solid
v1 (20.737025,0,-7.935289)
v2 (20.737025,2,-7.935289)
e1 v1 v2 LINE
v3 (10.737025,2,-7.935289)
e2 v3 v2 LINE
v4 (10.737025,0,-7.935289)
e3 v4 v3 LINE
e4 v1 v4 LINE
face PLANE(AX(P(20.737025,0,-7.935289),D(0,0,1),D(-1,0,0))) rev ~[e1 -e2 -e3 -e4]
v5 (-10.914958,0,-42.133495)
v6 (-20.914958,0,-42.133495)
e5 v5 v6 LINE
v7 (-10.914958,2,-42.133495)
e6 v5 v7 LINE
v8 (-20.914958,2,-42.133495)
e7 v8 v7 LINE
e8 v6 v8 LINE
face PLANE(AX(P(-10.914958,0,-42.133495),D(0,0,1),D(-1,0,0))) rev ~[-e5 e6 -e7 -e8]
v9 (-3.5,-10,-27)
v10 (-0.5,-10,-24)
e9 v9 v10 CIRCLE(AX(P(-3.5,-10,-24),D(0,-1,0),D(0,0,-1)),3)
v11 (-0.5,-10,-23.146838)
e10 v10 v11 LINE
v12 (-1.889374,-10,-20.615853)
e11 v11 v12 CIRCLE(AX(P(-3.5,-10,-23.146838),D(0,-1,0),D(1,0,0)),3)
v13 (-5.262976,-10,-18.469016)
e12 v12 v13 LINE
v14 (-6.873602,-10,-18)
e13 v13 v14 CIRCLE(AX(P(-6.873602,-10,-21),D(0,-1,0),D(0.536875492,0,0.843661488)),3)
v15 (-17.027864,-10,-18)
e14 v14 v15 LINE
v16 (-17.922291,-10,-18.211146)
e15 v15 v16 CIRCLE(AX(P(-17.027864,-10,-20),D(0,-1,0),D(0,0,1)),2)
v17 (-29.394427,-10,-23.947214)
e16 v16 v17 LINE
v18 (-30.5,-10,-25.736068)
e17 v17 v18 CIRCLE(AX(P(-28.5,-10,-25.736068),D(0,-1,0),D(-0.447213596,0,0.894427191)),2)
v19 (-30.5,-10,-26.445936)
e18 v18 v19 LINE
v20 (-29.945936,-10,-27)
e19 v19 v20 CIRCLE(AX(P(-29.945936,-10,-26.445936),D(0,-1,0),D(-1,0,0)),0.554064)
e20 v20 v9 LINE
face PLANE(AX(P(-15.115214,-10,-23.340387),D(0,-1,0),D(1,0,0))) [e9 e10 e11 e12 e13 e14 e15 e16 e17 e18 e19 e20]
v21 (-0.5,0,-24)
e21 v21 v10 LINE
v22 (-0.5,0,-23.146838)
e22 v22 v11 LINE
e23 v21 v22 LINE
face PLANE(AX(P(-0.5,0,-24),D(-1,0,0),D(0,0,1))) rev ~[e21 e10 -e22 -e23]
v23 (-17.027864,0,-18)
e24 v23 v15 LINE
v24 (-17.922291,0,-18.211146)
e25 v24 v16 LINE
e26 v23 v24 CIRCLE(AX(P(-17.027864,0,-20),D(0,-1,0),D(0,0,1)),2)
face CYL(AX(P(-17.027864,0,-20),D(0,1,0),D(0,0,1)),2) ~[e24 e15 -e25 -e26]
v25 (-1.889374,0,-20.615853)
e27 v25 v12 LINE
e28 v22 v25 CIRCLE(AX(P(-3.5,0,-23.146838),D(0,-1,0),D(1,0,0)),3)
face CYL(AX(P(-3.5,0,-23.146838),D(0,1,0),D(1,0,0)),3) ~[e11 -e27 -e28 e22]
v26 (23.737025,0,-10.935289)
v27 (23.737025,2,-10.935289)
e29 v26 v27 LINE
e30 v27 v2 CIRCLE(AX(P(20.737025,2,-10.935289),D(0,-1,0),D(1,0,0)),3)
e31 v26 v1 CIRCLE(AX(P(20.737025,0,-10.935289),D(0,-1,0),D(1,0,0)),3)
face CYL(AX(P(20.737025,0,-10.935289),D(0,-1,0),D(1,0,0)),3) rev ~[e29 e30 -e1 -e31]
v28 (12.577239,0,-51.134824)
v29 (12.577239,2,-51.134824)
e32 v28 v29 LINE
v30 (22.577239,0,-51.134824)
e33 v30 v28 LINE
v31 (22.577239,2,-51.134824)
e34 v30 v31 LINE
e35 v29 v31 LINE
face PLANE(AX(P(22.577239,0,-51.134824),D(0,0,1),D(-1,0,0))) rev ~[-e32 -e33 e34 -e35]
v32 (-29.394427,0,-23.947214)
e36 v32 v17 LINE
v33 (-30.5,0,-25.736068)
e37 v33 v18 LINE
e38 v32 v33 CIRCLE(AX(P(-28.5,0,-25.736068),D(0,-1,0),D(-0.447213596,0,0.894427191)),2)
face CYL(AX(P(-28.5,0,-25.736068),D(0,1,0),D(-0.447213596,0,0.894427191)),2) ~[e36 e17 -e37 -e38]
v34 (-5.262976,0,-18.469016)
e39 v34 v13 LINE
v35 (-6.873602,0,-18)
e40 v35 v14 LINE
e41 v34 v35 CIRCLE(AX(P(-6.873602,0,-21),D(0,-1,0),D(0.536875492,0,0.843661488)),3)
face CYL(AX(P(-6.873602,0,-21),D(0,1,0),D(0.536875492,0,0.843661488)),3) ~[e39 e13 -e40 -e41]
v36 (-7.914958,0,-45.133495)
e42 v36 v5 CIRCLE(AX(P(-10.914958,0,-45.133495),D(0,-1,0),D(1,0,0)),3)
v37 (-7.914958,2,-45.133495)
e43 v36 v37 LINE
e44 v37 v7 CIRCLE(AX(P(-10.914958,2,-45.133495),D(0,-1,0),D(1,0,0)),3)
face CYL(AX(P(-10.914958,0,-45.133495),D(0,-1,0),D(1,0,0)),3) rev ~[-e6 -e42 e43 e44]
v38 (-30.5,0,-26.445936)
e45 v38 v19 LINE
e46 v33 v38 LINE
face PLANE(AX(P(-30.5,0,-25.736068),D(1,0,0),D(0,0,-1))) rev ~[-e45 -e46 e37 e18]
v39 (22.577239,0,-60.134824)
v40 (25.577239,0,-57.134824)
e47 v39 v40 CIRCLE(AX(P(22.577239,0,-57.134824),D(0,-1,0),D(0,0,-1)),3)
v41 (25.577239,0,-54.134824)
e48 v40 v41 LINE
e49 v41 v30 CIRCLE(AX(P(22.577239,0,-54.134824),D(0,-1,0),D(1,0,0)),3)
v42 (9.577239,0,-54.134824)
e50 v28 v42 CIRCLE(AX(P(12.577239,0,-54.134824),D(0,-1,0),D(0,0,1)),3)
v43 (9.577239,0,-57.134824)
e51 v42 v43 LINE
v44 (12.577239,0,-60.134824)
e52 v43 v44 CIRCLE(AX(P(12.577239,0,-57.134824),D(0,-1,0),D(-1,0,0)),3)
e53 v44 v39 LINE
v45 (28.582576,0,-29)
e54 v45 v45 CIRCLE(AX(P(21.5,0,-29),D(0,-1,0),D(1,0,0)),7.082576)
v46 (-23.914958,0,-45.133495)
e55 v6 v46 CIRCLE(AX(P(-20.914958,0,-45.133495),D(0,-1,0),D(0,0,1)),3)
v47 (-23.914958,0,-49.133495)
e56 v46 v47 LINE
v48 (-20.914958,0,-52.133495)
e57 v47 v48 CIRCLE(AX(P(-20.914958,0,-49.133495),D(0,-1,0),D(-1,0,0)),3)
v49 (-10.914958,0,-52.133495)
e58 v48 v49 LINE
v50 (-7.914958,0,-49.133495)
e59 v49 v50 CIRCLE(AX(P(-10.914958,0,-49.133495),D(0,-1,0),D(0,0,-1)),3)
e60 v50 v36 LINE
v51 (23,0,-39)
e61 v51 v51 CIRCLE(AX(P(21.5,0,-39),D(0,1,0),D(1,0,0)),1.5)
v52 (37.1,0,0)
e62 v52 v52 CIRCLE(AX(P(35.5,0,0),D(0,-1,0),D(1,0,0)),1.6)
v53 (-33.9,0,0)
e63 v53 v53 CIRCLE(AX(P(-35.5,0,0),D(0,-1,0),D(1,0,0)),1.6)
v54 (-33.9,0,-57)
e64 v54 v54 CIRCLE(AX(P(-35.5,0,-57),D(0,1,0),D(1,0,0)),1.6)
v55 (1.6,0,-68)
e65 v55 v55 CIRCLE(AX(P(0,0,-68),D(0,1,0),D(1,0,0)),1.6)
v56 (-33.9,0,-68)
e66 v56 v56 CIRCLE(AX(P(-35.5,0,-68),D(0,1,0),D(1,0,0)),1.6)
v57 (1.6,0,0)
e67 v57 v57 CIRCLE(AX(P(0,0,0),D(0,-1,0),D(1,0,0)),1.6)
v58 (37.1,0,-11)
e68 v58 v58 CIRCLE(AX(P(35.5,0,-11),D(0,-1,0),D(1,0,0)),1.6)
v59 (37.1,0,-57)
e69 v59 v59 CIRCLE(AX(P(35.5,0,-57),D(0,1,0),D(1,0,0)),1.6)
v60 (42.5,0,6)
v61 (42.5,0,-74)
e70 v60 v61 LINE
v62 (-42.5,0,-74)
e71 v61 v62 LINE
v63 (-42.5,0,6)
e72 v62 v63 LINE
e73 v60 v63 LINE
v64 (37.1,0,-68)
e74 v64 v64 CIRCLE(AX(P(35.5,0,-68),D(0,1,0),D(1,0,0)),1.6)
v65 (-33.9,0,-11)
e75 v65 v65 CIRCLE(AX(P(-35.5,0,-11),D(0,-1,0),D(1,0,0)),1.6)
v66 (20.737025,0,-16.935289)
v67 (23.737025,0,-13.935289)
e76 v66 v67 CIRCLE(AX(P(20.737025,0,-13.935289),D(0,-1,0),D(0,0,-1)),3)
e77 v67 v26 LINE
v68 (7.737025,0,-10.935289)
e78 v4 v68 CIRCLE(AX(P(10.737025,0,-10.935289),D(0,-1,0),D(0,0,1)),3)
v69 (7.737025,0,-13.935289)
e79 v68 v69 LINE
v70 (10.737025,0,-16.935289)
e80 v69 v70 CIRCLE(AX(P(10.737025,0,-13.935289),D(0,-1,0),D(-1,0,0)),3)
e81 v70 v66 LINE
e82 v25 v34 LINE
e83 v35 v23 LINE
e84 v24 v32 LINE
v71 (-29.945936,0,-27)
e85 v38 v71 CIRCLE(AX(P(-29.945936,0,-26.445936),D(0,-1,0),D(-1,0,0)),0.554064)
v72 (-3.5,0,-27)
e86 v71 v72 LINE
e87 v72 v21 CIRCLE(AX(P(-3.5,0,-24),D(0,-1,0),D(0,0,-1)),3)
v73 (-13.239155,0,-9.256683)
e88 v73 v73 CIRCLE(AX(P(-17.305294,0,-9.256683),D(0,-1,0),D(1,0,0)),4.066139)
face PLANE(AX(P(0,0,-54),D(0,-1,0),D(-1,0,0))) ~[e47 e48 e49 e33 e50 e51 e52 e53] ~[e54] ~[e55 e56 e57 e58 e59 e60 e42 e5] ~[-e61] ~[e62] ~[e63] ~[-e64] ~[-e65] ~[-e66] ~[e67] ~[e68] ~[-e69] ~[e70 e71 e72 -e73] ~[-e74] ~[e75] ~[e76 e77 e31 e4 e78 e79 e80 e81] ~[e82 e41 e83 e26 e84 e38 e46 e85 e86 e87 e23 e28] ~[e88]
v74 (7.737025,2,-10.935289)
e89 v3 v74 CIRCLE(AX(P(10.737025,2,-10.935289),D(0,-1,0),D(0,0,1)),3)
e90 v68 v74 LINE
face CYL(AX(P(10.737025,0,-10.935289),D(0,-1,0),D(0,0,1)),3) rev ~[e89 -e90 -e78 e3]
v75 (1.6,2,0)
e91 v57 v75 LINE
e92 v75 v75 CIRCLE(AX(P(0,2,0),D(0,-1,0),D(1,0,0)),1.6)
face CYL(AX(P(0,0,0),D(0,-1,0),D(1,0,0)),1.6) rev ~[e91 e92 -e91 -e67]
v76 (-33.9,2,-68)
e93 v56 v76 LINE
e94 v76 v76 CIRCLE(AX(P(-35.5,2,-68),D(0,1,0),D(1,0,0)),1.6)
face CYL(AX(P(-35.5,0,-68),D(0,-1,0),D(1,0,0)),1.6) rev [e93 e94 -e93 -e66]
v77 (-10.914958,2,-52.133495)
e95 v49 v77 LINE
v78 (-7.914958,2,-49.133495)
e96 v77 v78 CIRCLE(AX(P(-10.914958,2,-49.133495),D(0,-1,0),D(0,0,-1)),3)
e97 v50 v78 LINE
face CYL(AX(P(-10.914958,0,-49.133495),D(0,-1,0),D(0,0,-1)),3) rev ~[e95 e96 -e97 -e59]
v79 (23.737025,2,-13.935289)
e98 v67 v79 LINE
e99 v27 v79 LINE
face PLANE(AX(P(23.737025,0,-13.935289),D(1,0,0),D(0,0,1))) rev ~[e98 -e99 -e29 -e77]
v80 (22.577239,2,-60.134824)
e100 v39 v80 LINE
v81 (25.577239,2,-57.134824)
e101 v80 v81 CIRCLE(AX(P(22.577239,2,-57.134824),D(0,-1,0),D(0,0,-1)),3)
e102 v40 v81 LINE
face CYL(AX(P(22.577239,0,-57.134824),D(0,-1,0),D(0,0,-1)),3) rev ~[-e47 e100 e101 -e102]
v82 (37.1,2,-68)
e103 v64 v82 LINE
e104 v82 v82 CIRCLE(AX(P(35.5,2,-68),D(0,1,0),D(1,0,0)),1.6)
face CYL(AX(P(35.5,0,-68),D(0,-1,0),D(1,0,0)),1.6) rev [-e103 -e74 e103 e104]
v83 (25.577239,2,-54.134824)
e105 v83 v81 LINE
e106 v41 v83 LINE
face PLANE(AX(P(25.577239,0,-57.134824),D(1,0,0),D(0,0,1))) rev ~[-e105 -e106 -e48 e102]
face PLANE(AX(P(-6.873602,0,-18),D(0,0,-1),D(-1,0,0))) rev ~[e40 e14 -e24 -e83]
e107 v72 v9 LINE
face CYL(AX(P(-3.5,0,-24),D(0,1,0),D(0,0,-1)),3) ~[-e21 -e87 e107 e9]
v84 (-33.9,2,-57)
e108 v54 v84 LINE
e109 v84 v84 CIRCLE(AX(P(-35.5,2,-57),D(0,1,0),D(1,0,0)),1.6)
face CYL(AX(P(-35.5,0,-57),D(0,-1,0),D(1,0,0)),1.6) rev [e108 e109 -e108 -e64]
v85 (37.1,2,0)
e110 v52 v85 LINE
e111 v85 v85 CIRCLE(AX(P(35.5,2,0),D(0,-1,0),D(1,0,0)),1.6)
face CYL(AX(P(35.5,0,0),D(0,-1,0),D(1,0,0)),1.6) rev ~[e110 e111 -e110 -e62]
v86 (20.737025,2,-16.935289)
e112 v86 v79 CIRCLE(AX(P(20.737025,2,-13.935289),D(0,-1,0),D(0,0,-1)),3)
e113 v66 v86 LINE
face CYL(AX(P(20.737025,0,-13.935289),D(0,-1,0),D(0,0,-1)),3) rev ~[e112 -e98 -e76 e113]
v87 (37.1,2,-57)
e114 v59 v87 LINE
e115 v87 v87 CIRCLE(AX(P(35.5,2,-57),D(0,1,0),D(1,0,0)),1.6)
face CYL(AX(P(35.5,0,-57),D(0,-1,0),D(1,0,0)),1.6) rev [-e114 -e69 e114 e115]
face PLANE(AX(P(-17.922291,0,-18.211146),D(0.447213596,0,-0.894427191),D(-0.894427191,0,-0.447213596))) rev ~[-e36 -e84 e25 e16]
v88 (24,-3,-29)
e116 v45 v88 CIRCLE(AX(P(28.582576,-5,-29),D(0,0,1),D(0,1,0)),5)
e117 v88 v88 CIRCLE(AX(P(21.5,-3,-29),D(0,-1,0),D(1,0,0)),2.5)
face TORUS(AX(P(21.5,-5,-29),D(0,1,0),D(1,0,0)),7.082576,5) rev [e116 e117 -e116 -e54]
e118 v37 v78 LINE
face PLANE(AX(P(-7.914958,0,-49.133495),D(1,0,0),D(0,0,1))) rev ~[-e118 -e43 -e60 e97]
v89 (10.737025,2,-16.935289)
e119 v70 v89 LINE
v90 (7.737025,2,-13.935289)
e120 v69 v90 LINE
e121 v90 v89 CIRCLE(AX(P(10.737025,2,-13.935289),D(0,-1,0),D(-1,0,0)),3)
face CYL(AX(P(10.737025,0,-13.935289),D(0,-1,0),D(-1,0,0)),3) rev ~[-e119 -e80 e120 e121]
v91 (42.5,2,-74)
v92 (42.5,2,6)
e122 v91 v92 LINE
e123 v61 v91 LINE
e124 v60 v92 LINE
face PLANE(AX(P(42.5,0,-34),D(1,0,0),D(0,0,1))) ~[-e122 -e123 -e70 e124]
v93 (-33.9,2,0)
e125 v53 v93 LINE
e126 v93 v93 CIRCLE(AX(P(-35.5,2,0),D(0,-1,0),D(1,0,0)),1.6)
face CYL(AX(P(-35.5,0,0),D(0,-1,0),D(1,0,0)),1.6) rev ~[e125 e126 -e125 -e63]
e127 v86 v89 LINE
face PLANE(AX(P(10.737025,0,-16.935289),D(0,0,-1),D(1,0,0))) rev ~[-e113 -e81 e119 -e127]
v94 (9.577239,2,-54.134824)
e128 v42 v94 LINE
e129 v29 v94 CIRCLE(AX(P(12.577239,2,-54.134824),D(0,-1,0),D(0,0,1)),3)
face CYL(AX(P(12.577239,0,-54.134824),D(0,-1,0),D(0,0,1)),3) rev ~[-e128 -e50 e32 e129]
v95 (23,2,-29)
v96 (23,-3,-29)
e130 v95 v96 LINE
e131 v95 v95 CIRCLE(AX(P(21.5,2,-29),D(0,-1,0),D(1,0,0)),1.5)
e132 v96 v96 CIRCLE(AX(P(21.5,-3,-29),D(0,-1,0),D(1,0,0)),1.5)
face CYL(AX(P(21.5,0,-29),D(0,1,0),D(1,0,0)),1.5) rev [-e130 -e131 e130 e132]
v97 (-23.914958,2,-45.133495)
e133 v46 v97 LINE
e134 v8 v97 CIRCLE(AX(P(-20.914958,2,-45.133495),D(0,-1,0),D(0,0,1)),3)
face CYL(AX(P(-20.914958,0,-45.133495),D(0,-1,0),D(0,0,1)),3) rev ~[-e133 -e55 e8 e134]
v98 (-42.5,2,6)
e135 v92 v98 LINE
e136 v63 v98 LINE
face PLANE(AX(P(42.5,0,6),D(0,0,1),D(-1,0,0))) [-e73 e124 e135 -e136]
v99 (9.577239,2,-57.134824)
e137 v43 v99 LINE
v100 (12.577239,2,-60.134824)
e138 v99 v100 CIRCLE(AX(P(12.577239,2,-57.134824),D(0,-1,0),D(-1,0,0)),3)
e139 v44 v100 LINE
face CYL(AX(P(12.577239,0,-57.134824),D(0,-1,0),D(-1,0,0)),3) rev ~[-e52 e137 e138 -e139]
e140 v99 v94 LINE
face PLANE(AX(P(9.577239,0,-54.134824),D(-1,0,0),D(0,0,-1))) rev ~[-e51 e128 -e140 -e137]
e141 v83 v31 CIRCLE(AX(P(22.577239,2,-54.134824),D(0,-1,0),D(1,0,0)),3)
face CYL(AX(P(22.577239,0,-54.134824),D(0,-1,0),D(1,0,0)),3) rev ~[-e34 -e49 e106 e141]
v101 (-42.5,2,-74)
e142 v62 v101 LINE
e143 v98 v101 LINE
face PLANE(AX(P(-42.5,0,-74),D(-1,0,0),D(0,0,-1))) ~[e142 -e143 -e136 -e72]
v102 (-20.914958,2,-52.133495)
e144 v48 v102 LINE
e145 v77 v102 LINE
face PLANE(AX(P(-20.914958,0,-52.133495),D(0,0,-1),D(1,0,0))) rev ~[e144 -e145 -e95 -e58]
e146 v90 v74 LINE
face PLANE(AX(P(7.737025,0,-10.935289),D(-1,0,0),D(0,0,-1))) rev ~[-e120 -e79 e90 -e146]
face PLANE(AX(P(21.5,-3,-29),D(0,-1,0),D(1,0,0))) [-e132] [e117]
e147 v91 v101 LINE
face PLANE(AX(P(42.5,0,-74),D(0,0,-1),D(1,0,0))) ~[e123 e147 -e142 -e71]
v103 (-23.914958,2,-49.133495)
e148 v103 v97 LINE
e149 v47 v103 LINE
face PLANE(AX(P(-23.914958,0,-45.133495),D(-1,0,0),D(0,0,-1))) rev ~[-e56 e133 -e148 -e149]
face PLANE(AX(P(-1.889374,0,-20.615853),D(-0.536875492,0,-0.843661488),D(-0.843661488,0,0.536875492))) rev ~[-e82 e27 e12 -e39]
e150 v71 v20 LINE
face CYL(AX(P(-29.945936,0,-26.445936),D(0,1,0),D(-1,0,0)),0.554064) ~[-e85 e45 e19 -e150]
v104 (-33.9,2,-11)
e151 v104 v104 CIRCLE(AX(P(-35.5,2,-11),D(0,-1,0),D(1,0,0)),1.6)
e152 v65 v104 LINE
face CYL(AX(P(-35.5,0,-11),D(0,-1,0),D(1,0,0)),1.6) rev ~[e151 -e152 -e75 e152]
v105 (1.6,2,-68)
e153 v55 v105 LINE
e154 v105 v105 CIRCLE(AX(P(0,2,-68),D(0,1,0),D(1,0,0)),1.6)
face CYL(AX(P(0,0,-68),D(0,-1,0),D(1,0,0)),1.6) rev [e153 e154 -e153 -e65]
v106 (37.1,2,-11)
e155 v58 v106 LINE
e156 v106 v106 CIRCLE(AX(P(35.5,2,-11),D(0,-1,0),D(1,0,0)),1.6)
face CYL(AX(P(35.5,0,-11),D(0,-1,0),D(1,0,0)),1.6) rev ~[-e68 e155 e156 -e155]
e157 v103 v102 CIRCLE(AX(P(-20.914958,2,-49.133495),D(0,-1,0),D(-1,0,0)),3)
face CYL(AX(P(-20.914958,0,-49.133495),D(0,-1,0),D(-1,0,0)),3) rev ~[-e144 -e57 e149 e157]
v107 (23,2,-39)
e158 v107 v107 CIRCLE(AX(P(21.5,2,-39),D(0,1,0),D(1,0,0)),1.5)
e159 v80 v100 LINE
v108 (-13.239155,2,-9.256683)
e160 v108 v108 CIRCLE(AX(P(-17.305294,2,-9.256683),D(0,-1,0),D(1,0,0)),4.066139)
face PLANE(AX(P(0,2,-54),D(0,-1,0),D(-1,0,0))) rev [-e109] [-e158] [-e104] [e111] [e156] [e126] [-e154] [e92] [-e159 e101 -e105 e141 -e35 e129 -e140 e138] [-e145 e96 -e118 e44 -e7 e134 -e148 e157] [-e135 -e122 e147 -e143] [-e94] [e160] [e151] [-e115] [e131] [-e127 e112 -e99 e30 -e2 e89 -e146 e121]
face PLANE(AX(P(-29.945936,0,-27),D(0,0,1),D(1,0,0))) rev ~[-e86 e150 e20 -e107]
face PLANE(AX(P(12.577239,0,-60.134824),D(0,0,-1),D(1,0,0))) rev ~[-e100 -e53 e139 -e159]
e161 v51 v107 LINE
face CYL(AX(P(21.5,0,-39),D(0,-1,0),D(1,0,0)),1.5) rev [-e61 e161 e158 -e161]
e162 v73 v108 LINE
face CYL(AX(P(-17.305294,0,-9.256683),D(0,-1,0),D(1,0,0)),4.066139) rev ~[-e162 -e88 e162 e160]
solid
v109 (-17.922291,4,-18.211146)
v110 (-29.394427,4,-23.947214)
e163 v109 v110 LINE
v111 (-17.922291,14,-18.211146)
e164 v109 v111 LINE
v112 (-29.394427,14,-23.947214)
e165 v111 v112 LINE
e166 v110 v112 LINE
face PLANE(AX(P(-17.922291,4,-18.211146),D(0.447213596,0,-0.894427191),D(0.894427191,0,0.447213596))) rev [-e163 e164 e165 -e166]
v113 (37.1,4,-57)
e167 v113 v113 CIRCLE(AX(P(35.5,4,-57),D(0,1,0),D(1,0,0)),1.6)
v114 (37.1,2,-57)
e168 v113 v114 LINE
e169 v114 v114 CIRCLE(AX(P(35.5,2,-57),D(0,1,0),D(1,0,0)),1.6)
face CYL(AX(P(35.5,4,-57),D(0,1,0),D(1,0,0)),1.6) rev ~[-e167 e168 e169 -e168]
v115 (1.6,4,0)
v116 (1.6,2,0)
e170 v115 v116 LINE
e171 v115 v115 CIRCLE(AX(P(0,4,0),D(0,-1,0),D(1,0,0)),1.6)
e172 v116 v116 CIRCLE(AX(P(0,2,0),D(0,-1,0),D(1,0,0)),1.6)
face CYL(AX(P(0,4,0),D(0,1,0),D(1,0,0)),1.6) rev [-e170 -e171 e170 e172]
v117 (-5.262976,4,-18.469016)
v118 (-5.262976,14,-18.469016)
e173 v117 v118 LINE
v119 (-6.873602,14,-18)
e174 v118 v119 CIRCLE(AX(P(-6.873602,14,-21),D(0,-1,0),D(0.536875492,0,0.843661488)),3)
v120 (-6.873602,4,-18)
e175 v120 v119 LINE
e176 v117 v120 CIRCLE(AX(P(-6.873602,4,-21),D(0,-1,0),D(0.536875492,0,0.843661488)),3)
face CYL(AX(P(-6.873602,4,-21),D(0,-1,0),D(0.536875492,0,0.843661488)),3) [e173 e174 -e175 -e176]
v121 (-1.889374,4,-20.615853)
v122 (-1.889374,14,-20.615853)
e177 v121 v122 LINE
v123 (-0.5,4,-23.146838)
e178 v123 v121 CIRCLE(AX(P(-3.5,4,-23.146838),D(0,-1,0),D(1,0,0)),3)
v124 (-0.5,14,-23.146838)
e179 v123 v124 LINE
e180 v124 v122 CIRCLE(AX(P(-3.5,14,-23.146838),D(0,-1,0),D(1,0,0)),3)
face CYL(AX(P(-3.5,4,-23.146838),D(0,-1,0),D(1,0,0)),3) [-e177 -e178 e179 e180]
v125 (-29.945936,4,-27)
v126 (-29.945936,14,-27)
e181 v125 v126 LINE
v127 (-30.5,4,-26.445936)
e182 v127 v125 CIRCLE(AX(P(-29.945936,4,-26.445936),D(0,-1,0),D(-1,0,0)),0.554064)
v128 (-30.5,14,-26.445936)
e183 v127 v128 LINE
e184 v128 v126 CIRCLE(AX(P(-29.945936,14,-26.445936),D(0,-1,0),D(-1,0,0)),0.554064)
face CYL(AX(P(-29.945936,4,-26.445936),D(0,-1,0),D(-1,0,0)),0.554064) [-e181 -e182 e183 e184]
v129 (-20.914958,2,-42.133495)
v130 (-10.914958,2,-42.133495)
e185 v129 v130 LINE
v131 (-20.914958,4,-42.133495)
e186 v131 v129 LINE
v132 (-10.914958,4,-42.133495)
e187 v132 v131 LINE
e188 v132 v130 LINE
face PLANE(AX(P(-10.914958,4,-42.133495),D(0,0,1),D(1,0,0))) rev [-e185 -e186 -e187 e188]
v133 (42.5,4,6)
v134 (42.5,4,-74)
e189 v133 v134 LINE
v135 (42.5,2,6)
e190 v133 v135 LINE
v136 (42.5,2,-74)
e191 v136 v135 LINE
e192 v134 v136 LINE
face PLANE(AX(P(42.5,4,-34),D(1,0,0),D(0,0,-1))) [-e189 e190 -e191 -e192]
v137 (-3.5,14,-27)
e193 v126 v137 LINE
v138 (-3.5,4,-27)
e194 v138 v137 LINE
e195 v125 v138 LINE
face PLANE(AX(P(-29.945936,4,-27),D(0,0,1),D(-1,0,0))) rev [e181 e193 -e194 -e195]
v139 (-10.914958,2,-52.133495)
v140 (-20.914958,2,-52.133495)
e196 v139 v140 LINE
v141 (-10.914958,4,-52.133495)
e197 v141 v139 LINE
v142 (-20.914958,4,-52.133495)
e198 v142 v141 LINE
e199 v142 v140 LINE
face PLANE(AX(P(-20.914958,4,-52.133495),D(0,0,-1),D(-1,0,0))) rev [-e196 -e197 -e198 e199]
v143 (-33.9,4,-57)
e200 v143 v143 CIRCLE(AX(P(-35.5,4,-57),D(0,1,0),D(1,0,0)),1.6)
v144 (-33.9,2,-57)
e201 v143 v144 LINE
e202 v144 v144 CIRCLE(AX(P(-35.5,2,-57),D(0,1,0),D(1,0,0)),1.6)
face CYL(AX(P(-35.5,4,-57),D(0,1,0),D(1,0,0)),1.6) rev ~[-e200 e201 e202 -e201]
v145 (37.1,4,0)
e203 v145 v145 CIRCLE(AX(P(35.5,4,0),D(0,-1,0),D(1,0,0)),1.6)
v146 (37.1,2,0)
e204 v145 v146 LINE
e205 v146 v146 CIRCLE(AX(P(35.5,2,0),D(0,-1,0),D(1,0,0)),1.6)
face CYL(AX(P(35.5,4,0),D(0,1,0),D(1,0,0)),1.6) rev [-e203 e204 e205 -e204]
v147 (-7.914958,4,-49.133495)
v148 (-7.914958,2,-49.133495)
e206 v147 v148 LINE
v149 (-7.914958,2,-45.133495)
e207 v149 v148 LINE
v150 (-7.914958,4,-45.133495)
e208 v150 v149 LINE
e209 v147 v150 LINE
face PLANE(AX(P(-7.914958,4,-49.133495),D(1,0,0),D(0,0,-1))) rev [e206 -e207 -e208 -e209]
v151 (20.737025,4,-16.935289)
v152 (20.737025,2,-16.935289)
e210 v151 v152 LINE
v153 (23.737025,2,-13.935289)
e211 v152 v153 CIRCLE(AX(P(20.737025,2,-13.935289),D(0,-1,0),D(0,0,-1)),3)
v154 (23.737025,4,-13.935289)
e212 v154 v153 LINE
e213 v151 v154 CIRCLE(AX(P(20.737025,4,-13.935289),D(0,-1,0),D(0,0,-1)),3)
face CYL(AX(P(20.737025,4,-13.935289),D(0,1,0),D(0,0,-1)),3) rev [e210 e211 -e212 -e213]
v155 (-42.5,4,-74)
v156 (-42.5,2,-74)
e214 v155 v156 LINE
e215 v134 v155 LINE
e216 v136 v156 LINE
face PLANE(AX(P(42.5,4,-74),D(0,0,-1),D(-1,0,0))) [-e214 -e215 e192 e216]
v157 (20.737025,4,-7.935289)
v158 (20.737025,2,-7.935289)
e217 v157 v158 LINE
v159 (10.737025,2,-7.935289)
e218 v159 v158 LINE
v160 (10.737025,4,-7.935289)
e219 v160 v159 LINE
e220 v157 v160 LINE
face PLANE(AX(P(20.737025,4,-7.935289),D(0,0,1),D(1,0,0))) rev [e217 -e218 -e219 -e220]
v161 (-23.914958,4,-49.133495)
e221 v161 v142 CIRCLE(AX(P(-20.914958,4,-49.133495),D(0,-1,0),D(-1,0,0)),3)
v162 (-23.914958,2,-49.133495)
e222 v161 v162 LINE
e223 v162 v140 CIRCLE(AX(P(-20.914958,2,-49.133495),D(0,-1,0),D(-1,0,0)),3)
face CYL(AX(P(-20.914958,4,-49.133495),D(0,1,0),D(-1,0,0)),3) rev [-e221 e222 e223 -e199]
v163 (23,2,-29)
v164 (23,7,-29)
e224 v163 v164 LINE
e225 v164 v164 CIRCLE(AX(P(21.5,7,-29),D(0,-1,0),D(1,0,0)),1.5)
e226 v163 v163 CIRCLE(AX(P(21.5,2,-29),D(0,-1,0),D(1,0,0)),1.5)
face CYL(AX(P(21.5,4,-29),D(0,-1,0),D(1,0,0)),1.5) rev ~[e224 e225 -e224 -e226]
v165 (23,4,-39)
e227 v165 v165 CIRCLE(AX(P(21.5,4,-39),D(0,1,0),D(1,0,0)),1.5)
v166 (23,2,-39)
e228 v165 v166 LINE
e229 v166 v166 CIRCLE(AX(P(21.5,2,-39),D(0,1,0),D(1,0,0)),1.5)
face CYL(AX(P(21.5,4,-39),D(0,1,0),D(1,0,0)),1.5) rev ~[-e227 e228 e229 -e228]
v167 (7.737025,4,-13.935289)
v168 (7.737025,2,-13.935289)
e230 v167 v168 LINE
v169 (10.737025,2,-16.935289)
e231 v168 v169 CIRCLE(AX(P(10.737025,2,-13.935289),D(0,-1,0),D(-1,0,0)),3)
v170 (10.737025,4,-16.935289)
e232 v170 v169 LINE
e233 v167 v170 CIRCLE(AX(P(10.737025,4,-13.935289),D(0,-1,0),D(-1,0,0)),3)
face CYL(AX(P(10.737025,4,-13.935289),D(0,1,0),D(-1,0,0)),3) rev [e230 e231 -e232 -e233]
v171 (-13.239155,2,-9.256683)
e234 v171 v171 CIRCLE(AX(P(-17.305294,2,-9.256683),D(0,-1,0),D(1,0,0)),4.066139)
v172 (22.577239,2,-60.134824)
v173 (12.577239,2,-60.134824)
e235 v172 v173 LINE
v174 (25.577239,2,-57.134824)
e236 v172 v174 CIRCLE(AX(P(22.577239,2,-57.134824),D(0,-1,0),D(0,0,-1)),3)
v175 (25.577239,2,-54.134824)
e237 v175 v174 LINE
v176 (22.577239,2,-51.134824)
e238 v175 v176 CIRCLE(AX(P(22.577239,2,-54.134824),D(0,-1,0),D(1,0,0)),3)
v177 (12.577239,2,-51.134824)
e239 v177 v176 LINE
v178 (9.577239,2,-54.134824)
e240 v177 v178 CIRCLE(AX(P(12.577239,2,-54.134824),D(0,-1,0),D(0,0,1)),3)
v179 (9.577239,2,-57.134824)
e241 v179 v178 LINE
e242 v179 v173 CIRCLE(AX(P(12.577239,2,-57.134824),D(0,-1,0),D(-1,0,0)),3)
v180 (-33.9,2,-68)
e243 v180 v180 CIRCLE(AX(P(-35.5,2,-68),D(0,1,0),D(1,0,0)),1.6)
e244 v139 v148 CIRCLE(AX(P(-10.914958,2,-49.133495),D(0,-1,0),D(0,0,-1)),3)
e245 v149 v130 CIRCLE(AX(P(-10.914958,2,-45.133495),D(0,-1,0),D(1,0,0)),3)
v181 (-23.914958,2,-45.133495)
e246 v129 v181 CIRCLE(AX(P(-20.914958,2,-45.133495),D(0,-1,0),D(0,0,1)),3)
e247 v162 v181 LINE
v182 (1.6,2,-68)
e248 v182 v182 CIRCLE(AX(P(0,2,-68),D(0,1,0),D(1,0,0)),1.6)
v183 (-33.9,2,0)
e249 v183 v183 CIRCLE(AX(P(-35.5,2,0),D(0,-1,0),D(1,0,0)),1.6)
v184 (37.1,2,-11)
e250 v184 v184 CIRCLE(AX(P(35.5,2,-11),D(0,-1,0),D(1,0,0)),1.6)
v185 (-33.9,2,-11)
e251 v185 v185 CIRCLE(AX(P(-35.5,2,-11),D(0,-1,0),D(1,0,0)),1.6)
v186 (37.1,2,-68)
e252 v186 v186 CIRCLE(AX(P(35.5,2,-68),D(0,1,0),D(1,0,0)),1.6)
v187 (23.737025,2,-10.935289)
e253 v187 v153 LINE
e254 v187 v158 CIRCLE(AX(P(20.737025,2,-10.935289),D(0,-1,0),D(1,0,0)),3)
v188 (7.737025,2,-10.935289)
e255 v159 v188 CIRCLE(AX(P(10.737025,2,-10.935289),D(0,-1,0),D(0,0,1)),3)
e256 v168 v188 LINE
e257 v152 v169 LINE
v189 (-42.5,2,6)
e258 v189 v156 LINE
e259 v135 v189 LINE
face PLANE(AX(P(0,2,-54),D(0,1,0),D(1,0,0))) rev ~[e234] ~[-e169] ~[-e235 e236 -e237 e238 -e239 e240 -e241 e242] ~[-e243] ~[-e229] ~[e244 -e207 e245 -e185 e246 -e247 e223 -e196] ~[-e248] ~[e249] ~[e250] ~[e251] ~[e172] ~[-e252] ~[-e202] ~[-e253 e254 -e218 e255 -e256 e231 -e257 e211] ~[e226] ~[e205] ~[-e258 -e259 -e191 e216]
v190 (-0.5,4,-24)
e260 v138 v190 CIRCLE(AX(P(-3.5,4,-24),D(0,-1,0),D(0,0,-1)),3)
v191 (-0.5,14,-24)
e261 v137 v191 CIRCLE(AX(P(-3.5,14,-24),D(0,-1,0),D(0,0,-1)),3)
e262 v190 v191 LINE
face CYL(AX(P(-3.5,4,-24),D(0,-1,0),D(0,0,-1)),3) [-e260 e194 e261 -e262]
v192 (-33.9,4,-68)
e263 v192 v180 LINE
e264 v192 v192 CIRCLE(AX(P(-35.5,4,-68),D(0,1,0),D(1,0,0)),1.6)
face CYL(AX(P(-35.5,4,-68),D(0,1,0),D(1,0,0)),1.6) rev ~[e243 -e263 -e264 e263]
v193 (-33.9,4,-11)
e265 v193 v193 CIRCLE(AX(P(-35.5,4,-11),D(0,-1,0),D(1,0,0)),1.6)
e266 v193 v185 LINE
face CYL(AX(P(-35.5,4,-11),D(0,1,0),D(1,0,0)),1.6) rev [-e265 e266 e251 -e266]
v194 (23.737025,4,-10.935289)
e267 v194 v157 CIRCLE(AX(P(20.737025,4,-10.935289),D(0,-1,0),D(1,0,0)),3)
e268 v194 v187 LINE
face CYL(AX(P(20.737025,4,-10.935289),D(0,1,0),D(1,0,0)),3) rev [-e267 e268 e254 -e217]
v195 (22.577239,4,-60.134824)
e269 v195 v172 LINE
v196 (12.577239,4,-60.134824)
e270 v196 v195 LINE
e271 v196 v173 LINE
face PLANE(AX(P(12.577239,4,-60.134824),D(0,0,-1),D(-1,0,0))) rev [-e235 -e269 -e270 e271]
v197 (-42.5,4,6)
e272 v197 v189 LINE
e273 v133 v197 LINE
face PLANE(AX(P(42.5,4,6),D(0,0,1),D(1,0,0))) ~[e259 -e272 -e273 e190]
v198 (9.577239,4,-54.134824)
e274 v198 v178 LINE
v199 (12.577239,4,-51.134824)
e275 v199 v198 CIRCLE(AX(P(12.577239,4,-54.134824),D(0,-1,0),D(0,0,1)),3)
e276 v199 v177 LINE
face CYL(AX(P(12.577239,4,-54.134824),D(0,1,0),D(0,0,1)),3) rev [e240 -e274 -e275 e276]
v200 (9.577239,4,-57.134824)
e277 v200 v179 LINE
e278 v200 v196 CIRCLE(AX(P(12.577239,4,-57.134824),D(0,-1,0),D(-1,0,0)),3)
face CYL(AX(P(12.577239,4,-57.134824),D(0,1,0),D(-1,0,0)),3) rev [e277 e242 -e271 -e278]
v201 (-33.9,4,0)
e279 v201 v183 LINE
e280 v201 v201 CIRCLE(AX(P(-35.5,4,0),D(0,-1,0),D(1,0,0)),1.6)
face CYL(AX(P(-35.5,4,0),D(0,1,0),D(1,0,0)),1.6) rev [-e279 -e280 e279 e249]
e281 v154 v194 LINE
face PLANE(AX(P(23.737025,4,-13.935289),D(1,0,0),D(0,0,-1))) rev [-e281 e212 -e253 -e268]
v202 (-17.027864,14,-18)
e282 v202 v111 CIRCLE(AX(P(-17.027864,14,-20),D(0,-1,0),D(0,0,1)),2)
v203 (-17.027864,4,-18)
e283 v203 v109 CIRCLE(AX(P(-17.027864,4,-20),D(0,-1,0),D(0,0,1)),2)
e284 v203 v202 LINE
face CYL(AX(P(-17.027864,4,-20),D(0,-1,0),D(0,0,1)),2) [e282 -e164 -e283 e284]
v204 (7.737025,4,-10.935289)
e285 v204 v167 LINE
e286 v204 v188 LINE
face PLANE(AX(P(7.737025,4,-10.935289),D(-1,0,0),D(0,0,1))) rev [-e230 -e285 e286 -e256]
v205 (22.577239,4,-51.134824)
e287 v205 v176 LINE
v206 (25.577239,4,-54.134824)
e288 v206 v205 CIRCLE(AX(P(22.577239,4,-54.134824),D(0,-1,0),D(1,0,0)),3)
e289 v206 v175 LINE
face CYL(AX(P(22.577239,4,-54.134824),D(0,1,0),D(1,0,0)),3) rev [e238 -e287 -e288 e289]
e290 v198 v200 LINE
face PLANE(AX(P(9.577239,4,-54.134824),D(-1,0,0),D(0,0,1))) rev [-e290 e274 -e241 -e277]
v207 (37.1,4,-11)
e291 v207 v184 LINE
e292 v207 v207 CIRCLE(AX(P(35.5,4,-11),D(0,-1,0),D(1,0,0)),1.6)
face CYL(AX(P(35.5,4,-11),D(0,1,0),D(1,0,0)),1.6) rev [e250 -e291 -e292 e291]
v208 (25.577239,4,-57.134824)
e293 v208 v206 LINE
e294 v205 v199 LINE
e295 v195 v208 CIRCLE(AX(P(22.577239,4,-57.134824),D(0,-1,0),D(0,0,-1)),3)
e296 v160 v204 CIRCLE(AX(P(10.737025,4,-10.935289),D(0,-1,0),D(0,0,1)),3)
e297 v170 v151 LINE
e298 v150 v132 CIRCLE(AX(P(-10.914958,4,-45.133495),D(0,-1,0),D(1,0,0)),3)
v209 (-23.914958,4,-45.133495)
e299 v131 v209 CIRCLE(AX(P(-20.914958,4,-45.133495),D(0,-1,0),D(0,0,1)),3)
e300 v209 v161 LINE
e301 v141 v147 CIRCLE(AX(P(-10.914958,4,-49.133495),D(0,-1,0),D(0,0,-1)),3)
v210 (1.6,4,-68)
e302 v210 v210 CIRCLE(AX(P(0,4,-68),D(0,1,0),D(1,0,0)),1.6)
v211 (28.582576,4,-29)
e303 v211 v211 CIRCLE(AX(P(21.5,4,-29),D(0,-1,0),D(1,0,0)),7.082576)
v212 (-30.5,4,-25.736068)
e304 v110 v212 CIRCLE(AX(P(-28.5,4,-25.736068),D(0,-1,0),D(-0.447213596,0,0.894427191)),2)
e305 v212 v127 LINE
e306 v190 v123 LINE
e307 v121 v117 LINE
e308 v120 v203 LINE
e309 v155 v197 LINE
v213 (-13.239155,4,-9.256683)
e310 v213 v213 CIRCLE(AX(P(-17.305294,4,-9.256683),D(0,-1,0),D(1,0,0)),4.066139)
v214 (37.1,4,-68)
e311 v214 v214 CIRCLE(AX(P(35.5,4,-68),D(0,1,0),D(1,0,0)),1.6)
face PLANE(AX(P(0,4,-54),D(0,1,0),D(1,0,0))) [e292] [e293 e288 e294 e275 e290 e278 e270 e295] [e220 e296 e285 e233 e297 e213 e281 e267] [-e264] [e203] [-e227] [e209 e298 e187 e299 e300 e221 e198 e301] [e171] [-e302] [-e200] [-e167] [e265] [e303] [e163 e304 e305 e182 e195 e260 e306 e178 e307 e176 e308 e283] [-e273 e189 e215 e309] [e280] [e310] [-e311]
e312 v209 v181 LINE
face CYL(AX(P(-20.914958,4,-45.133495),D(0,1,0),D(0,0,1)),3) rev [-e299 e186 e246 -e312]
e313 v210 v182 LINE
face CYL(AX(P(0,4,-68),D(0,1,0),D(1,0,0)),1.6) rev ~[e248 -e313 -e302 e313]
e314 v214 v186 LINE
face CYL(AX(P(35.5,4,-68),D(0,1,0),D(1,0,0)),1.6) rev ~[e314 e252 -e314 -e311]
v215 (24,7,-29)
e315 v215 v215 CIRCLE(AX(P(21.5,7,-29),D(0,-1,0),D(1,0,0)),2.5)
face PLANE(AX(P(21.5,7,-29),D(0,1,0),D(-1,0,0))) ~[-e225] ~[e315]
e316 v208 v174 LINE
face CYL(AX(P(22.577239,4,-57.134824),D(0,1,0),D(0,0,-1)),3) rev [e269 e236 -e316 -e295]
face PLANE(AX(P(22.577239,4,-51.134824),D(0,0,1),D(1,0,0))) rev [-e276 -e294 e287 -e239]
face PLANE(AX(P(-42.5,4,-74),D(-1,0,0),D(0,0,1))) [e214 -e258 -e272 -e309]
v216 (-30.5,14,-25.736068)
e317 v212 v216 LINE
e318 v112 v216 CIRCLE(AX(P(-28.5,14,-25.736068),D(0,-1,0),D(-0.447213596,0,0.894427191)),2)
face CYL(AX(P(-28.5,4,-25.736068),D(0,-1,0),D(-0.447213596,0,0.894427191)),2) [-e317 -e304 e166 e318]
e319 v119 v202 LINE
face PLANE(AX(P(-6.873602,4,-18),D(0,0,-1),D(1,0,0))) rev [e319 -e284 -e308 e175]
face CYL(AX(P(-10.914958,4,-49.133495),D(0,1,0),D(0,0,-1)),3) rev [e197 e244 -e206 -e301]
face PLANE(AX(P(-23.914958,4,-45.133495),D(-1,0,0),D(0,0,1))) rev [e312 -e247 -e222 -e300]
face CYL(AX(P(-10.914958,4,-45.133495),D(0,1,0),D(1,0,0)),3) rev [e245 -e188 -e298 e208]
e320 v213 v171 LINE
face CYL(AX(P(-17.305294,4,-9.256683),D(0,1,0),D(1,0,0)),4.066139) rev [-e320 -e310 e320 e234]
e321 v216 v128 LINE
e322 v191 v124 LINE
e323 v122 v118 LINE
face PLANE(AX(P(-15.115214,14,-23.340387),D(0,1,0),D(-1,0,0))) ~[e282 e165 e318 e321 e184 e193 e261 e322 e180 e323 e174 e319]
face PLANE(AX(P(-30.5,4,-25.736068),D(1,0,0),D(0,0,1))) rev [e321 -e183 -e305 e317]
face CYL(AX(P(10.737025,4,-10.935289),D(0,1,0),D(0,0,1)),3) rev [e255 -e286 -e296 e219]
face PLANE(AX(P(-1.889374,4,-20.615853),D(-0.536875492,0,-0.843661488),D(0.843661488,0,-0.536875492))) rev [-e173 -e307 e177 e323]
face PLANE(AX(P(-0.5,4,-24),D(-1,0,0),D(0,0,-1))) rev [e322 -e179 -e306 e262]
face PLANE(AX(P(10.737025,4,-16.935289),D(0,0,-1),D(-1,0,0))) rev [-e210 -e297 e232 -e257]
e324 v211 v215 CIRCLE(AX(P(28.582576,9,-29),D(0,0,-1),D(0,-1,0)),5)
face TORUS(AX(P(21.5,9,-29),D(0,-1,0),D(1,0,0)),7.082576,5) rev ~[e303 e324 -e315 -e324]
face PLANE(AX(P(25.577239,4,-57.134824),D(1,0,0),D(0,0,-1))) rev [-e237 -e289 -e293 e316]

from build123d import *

# Parameters (mm, degrees)
F0_R          = 2.5
F0_R_2        = 1.6
F0_R_3        = 1.5
F1_DEPTH      = 2
F3_DEPTH      = 10
F4_DEPTH      = 3
F4_DEPTH_BACK = 2
F6_R          = 4.0661391715
F7_DEPTH      = 25


# Not quite as in the source:
# - a fillet or chamfer that OpenCascade refuses, or shapes differently, is made with other operations: its cross-section is extruded or revolved along the edge and cut away or added


with BuildPart() as f1:
    # F0 (on Front) → F1 (new body)
    with BuildSketch(Plane.XZ):
        Polygon((42.5, -4), (42.5, 4), (42.5, 6), (-42.5, 6), (-42.5, 4), (-42.5, -4), (-42.5, -34), (42.5, -34), align=None)
        with BuildLine():
            Line((-3.5, -27), (-29.945935972, -27))
            ThreePointArc((-29.945935972, -27), (-30.3377184034, -26.8377184034), (-30.5, -26.445935972))
            Line((-30.5, -26.445935972), (-30.5, -25.7360679775))
            ThreePointArc((-30.5, -25.7360679775), (-30.2013016167, -24.6846057533), (-29.394427191, -23.9472135955))
            Line((-29.394427191, -23.9472135955), (-17.922291236, -18.211145618))
            ThreePointArc((-17.922291236, -18.211145618), (-17.4873698861, -18.0535020211), (-17.027864045, -18))
            Line((-17.027864045, -18), (-6.8736020616, -18))
            ThreePointArc((-6.8736020616, -18), (-6.0348391003, -18.1196394853), (-5.262975585, -18.4690155368))
            Line((-5.262975585, -18.4690155368), (-1.8893735234, -20.6158532124))
            ThreePointArc((-1.8893735234, -20.6158532124), (-0.87018257, -21.7032102011), (-0.5, -23.1468376756))
            Line((-0.5, -23.1468376756), (-0.5, -24))
            ThreePointArc((-0.5, -24), (-1.3786796564, -26.1213203436), (-3.5, -27))
        make_face(mode=Mode.SUBTRACT)
        with Locations((21.5, -29)):
            Circle(F0_R, mode=Mode.SUBTRACT)
        with Locations((-35.5, -11)):
            Circle(F0_R_2, mode=Mode.SUBTRACT)
        with Locations((-35.5, 0)):
            Circle(F0_R_2, mode=Mode.SUBTRACT)
        with Locations((35.5, -11)):
            Circle(F0_R_2, mode=Mode.SUBTRACT)
        Circle(F0_R_2, mode=Mode.SUBTRACT)
        with Locations((35.5, 0)):
            Circle(F0_R_2, mode=Mode.SUBTRACT)
        with BuildLine():
            ThreePointArc((-30.5, -26.445935972), (-30.3377184034, -26.8377184034), (-29.945935972, -27))
            Line((-29.945935972, -27), (-3.5, -27))
            ThreePointArc((-3.5, -27), (-1.3786796564, -26.1213203436), (-0.5, -24))
            Line((-0.5, -24), (-0.5, -23.1468376756))
            ThreePointArc((-0.5, -23.1468376756), (-0.87018257, -21.7032102011), (-1.8893735234, -20.6158532124))
            Line((-1.8893735234, -20.6158532124), (-5.262975585, -18.4690155368))
            ThreePointArc((-5.262975585, -18.4690155368), (-6.0348391003, -18.1196394853), (-6.8736020616, -18))
            Line((-6.8736020616, -18), (-17.027864045, -18))
            ThreePointArc((-17.027864045, -18), (-17.4873698861, -18.0535020211), (-17.922291236, -18.211145618))
            Line((-17.922291236, -18.211145618), (-29.394427191, -23.9472135955))
            ThreePointArc((-29.394427191, -23.9472135955), (-30.2013016167, -24.6846057533), (-30.5, -25.7360679775))
            Line((-30.5, -25.7360679775), (-30.5, -26.445935972))
        make_face()
        with Locations((21.5, -29)):
            Circle(F0_R)
        with Locations((21.5, -29)):
            Circle(F0_R_3, mode=Mode.SUBTRACT)
    extrude(amount=-F1_DEPTH)

    # F2: F1 across face


with BuildPart() as f1_1:
    add(f1.part)
    add(f1.part.mirror(Plane(origin=(0, 1, -34), x_dir=(1, 0, 0), z_dir=(0, 0, -1))))

    # F0 (on Front) → F3 (join)
    with BuildSketch(Plane.XZ):
        with BuildLine():
            ThreePointArc((-30.5, -26.445935972), (-30.3377184034, -26.8377184034), (-29.945935972, -27))
            Line((-29.945935972, -27), (-3.5, -27))
            ThreePointArc((-3.5, -27), (-1.3786796564, -26.1213203436), (-0.5, -24))
            Line((-0.5, -24), (-0.5, -23.1468376756))
            ThreePointArc((-0.5, -23.1468376756), (-0.87018257, -21.7032102011), (-1.8893735234, -20.6158532124))
            Line((-1.8893735234, -20.6158532124), (-5.262975585, -18.4690155368))
            ThreePointArc((-5.262975585, -18.4690155368), (-6.0348391003, -18.1196394853), (-6.8736020616, -18))
            Line((-6.8736020616, -18), (-17.027864045, -18))
            ThreePointArc((-17.027864045, -18), (-17.4873698861, -18.0535020211), (-17.922291236, -18.211145618))
            Line((-17.922291236, -18.211145618), (-29.394427191, -23.9472135955))
            ThreePointArc((-29.394427191, -23.9472135955), (-30.2013016167, -24.6846057533), (-30.5, -25.7360679775))
            Line((-30.5, -25.7360679775), (-30.5, -26.445935972))
        make_face()
    extrude(amount=F3_DEPTH)

    # F0 (on Front) → F4 (join, two sides)
    with BuildSketch(Plane.XZ) as f4_sk:
        with Locations((21.5, -29)):
            Circle(F0_R)
        with Locations((21.5, -29)):
            Circle(F0_R_3, mode=Mode.SUBTRACT)
    extrude(amount=F4_DEPTH)
    extrude(f4_sk.sketch, amount=-F4_DEPTH_BACK)

    # F5: fillet of radius 5 on 1 edges, made by hand

    # F5_s1 → F5_t2 (revolve)
    with BuildSketch(Plane.XY.offset(-29)):
        with BuildLine():
            ThreePointArc((28.582575695, 0), (25.8439629074, -0.8166998673), (24, -3))
            Line((24, -3), (24, 0))
            Line((24, 0), (28.582575695, 0))
        make_face()
    revolve(axis=Axis((21.5, 0, -29), (0, -1, 0)))

    # F6 (on face) → F7 (cut)
    with BuildSketch(Plane.XZ):
        with BuildLine():
            Line((22.5772393979, -51.1348243654), (12.5772393979, -51.1348243654))
            ThreePointArc((12.5772393979, -51.1348243654), (10.4559190544, -52.0135040218), (9.5772393979, -54.1348243654))
            Line((9.5772393979, -54.1348243654), (9.5772393979, -57.1348243654))
            ThreePointArc((9.5772393979, -57.1348243654), (10.4559190544, -59.2561447089), (12.5772393979, -60.1348243654))
            Line((12.5772393979, -60.1348243654), (22.5772393979, -60.1348243654))
            ThreePointArc((22.5772393979, -60.1348243654), (24.6985597415, -59.2561447089), (25.5772393979, -57.1348243654))
            Line((25.5772393979, -57.1348243654), (25.5772393979, -54.1348243654))
            ThreePointArc((25.5772393979, -54.1348243654), (24.6985597415, -52.0135040218), (22.5772393979, -51.1348243654))
        make_face()
        with BuildLine():
            Line((-10.9149579704, -42.1334951818), (-20.9149579704, -42.1334951818))
            ThreePointArc((-20.9149579704, -42.1334951818), (-23.0362783139, -43.0121748382), (-23.9149579704, -45.1334951818))
            Line((-23.9149579704, -45.1334951818), (-23.9149579704, -49.1334951818))
            ThreePointArc((-23.9149579704, -49.1334951818), (-23.0362783139, -51.2548155254), (-20.9149579704, -52.1334951818))
            Line((-20.9149579704, -52.1334951818), (-10.9149579704, -52.1334951818))
            ThreePointArc((-10.9149579704, -52.1334951818), (-8.7936376268, -51.2548155254), (-7.9149579704, -49.1334951818))
            Line((-7.9149579704, -49.1334951818), (-7.9149579704, -45.1334951818))
            ThreePointArc((-7.9149579704, -45.1334951818), (-8.7936376268, -43.0121748382), (-10.9149579704, -42.1334951818))
        make_face()
        with BuildLine():
            Line((20.7370246872, -7.9352889061), (10.7370246872, -7.9352889061))
            ThreePointArc((10.7370246872, -7.9352889061), (8.6157043437, -8.8139685625), (7.7370246872, -10.9352889061))
            Line((7.7370246872, -10.9352889061), (7.7370246872, -13.9352889061))
            ThreePointArc((7.7370246872, -13.9352889061), (8.6157043437, -16.0566092497), (10.7370246872, -16.9352889061))
            Line((10.7370246872, -16.9352889061), (20.7370246872, -16.9352889061))
            ThreePointArc((20.7370246872, -16.9352889061), (22.8583450308, -16.0566092497), (23.7370246872, -13.9352889061))
            Line((23.7370246872, -13.9352889061), (23.7370246872, -10.9352889061))
            ThreePointArc((23.7370246872, -10.9352889061), (22.8583450308, -8.8139685625), (20.7370246872, -7.9352889061))
        make_face()
        with Locations((-17.3052940518, -9.25668329)):
            Circle(F6_R)
    extrude(amount=-F7_DEPTH, mode=Mode.SUBTRACT)


with BuildPart() as f8_1:
    # F8: instance of F1
    add(f1_1.part.mirror(Plane(origin=(-0.2442776853, 2, -33.8837241542), x_dir=(-1, 0, 0), z_dir=(0, 1, 0))))


solid = Compound([f1_1.part, f8_1.part])
